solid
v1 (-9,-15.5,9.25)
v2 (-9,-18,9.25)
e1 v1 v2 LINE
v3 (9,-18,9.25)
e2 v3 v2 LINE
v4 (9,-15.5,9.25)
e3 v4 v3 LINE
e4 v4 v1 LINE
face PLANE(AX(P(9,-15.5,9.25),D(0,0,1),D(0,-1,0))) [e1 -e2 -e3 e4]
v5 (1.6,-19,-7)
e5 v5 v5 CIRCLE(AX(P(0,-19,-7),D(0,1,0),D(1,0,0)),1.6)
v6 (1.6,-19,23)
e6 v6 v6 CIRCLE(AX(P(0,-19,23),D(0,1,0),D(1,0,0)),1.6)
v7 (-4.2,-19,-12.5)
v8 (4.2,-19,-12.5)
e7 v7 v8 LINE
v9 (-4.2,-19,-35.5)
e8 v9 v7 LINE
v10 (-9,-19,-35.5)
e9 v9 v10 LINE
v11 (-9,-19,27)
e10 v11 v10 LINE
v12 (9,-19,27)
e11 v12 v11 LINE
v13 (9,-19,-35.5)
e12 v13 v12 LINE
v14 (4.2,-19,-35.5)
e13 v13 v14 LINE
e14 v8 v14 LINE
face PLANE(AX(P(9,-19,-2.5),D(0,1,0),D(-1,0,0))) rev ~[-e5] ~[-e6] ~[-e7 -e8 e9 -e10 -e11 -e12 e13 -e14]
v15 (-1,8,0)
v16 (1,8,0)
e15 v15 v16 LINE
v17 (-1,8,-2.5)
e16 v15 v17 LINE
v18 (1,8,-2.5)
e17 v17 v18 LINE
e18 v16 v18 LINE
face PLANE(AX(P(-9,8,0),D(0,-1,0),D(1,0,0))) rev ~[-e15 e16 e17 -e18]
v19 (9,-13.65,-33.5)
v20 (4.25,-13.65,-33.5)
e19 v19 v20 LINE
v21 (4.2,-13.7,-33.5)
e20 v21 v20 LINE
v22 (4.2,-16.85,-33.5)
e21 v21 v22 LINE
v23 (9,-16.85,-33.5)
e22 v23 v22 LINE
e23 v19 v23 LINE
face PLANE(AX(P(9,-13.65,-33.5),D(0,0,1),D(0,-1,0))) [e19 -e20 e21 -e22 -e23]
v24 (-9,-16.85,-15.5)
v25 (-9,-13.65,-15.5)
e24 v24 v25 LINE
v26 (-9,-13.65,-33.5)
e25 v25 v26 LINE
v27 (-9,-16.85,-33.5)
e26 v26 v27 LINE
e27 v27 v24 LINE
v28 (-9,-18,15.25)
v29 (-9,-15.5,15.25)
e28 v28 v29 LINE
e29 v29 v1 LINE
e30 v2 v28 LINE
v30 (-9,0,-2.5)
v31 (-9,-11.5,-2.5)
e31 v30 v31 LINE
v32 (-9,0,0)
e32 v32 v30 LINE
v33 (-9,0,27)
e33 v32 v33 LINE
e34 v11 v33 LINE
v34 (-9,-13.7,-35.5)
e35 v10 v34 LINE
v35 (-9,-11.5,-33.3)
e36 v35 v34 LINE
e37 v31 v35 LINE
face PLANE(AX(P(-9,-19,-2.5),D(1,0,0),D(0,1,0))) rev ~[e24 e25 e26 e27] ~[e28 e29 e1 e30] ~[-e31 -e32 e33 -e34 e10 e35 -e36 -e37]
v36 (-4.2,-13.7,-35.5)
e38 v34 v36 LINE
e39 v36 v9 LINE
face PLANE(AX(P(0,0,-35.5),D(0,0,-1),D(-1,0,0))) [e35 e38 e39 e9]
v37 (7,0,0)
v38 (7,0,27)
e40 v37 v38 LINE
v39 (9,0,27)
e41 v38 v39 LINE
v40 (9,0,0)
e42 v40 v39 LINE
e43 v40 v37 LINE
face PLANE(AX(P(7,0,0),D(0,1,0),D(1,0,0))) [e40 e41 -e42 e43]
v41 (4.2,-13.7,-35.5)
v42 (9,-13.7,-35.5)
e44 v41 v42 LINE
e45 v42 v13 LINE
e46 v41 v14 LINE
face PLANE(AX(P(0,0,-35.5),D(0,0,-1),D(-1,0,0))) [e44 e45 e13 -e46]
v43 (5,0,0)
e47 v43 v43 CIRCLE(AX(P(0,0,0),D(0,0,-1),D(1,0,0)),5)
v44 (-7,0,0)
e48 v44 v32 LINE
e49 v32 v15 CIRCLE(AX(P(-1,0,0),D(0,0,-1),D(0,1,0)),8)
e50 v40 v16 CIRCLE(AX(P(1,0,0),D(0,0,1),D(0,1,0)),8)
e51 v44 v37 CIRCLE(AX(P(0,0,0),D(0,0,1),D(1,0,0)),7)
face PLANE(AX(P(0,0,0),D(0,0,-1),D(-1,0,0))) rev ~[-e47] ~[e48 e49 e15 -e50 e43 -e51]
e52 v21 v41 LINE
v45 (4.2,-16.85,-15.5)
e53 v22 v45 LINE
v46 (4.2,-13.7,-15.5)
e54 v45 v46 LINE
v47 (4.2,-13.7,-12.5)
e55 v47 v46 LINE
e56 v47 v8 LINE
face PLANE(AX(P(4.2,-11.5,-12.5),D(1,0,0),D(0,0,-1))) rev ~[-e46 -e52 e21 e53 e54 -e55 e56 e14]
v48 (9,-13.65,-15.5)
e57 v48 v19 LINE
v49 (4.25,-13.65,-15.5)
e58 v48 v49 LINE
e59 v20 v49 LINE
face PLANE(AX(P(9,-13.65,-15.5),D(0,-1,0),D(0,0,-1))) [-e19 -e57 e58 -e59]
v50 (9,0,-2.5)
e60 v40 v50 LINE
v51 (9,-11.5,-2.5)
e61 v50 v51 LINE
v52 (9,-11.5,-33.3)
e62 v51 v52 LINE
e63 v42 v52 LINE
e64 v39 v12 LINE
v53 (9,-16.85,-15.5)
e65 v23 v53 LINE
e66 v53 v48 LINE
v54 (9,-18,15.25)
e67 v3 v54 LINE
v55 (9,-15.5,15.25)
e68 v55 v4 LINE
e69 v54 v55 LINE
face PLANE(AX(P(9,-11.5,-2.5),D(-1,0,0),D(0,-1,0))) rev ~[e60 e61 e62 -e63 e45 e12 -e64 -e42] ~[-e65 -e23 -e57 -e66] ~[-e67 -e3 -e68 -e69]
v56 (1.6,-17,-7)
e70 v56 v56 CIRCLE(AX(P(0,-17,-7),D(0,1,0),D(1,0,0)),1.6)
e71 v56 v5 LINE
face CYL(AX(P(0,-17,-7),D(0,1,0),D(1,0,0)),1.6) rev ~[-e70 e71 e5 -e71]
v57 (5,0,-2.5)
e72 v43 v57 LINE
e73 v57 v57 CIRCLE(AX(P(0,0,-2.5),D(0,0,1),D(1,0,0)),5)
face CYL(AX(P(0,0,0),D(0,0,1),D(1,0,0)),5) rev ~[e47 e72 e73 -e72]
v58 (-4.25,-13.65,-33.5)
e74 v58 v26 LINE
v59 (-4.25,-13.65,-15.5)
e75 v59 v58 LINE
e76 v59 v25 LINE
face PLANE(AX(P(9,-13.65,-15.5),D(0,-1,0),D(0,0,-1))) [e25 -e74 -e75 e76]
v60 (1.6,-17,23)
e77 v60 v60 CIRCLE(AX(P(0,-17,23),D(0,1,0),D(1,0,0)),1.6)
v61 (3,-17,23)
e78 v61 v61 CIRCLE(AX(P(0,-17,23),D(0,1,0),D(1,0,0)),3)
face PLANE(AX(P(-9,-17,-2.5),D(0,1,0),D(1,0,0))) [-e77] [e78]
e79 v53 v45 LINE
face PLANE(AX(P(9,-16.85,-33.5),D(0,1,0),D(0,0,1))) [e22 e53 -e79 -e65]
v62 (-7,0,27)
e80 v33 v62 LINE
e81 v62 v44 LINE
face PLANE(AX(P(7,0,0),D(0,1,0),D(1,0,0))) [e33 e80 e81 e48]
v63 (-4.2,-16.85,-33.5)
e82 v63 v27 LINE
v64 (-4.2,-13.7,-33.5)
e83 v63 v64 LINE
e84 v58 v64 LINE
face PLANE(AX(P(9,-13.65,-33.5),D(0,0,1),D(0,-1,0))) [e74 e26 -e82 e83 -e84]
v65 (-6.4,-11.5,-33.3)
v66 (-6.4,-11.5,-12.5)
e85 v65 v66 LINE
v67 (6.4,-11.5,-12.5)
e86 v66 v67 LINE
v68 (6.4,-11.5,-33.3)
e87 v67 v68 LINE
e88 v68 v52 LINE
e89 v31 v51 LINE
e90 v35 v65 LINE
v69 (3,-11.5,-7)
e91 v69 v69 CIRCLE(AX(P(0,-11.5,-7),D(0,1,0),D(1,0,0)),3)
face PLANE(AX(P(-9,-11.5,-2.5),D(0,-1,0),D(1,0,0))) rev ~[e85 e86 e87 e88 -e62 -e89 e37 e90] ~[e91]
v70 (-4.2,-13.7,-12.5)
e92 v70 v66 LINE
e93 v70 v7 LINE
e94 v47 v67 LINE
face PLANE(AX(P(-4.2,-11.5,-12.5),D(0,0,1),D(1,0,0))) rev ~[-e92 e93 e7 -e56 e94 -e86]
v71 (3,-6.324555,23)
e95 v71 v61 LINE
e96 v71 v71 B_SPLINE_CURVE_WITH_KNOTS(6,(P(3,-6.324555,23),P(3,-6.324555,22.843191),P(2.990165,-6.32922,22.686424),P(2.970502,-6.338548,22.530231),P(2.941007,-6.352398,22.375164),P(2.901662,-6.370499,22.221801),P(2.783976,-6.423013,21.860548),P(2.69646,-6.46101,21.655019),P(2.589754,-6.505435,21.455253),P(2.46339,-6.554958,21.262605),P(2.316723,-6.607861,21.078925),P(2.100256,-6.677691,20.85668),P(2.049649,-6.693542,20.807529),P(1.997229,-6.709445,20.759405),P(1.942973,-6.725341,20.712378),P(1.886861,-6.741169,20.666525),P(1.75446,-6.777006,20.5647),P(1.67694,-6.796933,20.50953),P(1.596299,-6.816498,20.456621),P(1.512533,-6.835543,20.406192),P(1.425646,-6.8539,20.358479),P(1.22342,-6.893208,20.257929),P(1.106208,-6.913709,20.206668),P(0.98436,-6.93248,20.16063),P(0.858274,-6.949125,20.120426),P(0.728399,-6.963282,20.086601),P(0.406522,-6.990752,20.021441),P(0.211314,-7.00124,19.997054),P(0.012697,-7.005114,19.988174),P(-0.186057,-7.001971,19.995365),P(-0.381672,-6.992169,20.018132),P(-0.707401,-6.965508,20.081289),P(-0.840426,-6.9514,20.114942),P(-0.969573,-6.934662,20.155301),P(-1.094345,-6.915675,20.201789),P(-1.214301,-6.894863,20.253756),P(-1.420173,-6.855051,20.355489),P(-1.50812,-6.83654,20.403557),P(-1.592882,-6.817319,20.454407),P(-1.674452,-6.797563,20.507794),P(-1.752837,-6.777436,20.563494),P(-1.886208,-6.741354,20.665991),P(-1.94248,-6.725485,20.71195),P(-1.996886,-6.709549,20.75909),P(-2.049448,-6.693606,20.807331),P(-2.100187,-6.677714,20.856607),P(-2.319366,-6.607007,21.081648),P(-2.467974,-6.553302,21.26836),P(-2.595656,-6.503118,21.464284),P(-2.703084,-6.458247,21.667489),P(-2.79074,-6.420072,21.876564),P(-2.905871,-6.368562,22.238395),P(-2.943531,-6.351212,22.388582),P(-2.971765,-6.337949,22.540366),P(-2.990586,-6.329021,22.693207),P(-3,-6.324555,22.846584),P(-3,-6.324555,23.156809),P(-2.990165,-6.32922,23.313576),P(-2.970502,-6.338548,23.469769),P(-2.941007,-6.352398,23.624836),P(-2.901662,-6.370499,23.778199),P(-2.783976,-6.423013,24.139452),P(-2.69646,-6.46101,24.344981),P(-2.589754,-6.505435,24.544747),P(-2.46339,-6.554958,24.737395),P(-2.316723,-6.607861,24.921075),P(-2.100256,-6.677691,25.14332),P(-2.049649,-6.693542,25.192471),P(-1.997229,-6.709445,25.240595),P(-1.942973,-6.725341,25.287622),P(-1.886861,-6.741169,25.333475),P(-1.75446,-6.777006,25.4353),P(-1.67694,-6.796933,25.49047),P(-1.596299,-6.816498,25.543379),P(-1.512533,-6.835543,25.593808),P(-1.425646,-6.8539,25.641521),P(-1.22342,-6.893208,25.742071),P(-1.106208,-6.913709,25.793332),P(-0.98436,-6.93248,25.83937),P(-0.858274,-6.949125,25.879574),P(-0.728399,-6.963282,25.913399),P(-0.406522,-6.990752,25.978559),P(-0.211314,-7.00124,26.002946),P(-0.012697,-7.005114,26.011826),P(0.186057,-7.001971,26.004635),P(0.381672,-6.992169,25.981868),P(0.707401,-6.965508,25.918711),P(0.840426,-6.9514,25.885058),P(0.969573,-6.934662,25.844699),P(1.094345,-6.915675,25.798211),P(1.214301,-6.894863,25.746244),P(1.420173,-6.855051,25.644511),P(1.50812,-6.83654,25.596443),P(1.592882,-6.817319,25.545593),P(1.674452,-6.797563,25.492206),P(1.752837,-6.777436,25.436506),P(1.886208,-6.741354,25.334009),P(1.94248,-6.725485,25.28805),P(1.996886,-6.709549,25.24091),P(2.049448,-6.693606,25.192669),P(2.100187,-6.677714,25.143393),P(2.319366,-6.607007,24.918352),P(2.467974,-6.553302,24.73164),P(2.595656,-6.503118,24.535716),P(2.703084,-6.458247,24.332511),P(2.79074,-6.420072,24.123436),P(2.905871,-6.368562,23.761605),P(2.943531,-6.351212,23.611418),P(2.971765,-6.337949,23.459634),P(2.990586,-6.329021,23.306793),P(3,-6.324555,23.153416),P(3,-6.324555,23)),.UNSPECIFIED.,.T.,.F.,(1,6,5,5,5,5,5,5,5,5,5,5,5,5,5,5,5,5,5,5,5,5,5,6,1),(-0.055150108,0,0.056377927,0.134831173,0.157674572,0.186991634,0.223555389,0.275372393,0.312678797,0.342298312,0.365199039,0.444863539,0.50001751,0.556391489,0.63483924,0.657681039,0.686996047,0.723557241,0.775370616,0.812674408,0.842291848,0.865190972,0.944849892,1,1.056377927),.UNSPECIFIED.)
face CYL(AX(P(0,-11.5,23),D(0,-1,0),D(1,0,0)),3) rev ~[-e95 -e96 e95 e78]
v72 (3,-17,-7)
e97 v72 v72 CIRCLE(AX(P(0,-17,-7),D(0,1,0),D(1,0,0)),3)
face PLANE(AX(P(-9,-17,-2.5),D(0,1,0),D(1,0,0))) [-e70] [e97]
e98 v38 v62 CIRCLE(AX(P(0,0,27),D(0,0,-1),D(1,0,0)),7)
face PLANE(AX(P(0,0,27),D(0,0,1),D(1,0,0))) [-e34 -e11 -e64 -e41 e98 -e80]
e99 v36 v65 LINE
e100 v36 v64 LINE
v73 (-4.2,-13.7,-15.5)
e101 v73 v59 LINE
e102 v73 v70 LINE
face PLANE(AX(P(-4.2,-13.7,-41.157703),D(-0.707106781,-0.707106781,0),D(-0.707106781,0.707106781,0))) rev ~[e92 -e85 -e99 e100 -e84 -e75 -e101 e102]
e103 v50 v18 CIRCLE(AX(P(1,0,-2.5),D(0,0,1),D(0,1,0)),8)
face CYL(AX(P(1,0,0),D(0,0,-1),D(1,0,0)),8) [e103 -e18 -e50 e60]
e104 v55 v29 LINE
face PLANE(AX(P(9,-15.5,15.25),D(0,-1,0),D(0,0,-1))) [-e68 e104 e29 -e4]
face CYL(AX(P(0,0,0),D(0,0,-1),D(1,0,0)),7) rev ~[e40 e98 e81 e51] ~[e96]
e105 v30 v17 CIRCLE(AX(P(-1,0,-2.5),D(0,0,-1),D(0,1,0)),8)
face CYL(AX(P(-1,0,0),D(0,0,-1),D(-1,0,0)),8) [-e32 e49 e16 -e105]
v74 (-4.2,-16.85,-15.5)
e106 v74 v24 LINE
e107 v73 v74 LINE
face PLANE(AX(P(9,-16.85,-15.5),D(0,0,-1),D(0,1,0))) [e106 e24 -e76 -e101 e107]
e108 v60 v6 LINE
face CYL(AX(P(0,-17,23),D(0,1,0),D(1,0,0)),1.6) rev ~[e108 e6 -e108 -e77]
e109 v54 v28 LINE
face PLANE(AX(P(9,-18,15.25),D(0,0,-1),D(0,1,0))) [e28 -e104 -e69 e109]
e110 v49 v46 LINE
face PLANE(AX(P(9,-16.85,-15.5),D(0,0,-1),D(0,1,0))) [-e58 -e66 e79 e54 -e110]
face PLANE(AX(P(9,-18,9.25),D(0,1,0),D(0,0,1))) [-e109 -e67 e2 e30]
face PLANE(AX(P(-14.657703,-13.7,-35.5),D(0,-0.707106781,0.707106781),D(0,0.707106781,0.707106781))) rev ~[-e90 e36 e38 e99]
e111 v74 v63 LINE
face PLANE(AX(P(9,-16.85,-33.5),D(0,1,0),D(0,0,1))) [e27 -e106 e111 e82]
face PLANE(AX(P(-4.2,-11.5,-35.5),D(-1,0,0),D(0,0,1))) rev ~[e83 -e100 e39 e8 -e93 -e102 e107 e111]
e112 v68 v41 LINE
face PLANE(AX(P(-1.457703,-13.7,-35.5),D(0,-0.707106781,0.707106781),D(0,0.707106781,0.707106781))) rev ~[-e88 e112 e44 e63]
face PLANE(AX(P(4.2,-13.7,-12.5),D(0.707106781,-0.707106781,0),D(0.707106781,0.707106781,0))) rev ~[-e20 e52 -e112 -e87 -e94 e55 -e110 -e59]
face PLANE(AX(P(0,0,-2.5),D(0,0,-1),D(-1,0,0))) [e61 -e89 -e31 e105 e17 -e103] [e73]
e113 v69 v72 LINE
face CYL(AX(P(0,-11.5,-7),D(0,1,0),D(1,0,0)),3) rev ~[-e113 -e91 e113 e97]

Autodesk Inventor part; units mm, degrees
ref_plane "YZ Plane" through (0, 0, 0) normal (1, 0, 0) x (0, 1, 0)
ref_plane "XZ Plane" through (0, 0, 0) normal (0, 1, 0) x (-1, 0, 0)
ref_plane "XY Plane" through (0, 0, 0) normal (0, 0, 1) x (1, 0, 0)
sketch "Sketch1" plane through (0, 0, 0) normal (0, 0, 1) x (1, 0, 0)
  circle A0 centre (0, 0) radius 7
  circle A1 centre (0, 0) radius 5
  circle A2 centre (0, 0) radius 1
  line L0 (-9, 0) -> (9, 0)
  line L1 (9, 0) -> (9, -19)
  line L2 (9, -19) -> (-9, -19)
  line L3 (-9, -19) -> (-9, 0)
  dimension "d11" = 14
  dimension "d12" = 10
  dimension "d13" = 2
  dimension "d18" = 19
  dimension "d19" = 18
extrude "Extrusion1" add sketch "Sketch1" along normal blind 27 contours L0 L1 L2 L3 A0 | A0 L0 A1 | A1 L0 A2 | A2 L0 picked at (6.2655, -0.5584) picked at (3.6182, -0.3989) picked at (-0.2952, -0.1549)
sketch "Sketch3" plane through (0, 0, 0) normal (0, 0, -1) x (-1, 0, 0)
  line L0 (9, -19) -> (9, 0) projected
  line L1 (-9, -19) -> (9, -19)
  line L2 (9, -19) -> (9, 8)
  line L3 (9, 8) -> (-9, 8)
  line L4 (-9, 8) -> (-9, -19)
  dimension "d22" = 27
extrude "Extrusion6" add sketch "Sketch3" along normal blind 2.5
extrude "Extrusion5" cut sketch "Sketch1" along normal blind 30 contours L0 A1 A0 | A0 L0 A1 | L0 A2 A1 | A1 L0 A2 | L0 A2 | A2 L0
extrude "Extrusion7" cut sketch "Sketch1" against normal through all contours L0 A2 A1 | A1 L0 A2 | L0 A2 | A2 L0
fillet "Fillet1" radius 8 2 edges at (-9, 8, -1.25) (9, 8, -1.25)
sketch "Sketch4" plane through (9, -19, 27) normal (1, 0, 0) x (0, 0, -1)
  line L0 (0, 0) -> (29.5, 0) projected
  line L1 (11.75, 3.5) -> (17.75, 3.5)
  line L2 (17.75, 3.5) -> (17.75, 1)
  line L3 (17.75, 1) -> (11.75, 1)
  line L4 (11.75, 1) -> (11.75, 3.5)
  point P0 (14.75, 0)
  point P1 (14.75, 1)
  dimension "d32" = 6
  dimension "d33" = 2.5
  dimension "d34" = 1
extrude "Extrusion8" cut sketch "Sketch4" against normal through all
sketch "Sketch5" plane through (0, 0, -2.5) normal (0, 0, -1) x (-1, 0, 0)
  line L0 (9, -19) -> (9, 0) projected
  line L1 (-9, -19) -> (9, -19)
  line L2 (9, -19) -> (9, -11.5)
  line L3 (9, -11.5) -> (-9, -11.5)
  line L4 (-9, -11.5) -> (-9, -19)
  dimension "d37" = 7.5
extrude "Extrusion9" add sketch "Sketch5" along normal blind 33
sketch "Sketch6" plane through (-9, -11.5, -2.5) normal (0, 1, 0) x (1, 0, 0)
  line L0 (4.8, 10) -> (13.2, 10)
  line L1 (13.2, 10) -> (13.2, 33)
  line L2 (13.2, 33) -> (4.8, 33)
  line L3 (4.8, 33) -> (4.8, 10)
  line L4 (0, 33) -> (18, 33) projected
  point P0 (9, -2.5)
  point P1 (9, 33)
  point P2 (9, 33)
  dimension "d45" = 23
  dimension "d47" = 0
  dimension "d69" = 8.4
extrude "Extrusion10" cut sketch "Sketch6" against normal blind 30
sketch "Sketch7" plane through (9, -19, 27) normal (1, 0, 0) x (0, 0, -1)
  line L0 (42.5, 5.35) -> (60.5, 5.35)
  line L1 (60.5, 5.35) -> (60.5, 2.15)
  line L2 (60.5, 2.15) -> (42.5, 2.15)
  line L3 (42.5, 2.15) -> (42.5, 5.35)
  line L4 (62.5, 7.5) -> (62.5, 0) projected
  line L5 (62.5, 7.5) -> (39.5, 7.5) projected
  point P0 (27, 19)
  point P1 (60.5, 3.75)
  point P2 (62.5, 3.75)
  point P3 (51.5, 5.35)
  point P4 (51, 7.5)
  point P5 (59.5, 7.5)
  dimension "d49" = 3.2
  dimension "d55" = 18
  dimension "d70" = 20
extrude "Extrusion11" cut sketch "Sketch7" against normal through all
sketch "Sketch8" plane through (-9, -11.5, -2.5) normal (0, 1, 0) x (1, 0, 0)
  circle A0 centre (9, 4.5) radius 3
  circle A1 centre (9, -25.5) radius 3
  line L0 (16, -29.5) -> (2, -29.5) projected
  point P0 (9, -2.5)
  dimension "d56" = 6
  dimension "d57" = 6
  dimension "d58" = 4
  dimension "d59" = 34
extrude "Extrusion12" cut sketch "Sketch8" along normal mid plane 11
sketch "Sketch9" plane through (0, -17, -7) normal (0, 1, 0) x (1, 0, 0)
  circle A0 centre (0, 0) radius 3 projected
  circle A1 centre (0, 0) radius 1.6
  circle A2 centre (0, -30) radius 1.6
  point P0 (0, -7)
  dimension "d62" = 3.2
  dimension "d63" = 3.2
extrude "Extrusion13" cut sketch "Sketch9" against normal through all contours A1 | A2
chamfer "Chamfer2" distance 2.2 angle 45 4 edges at (4.2, -11.5, -24) (-4.2, -11.5, -24) (6.6, -11.5, -35.5) (-6.6, -11.5, -35.5)
properties part number "Solinoid holder v5"
